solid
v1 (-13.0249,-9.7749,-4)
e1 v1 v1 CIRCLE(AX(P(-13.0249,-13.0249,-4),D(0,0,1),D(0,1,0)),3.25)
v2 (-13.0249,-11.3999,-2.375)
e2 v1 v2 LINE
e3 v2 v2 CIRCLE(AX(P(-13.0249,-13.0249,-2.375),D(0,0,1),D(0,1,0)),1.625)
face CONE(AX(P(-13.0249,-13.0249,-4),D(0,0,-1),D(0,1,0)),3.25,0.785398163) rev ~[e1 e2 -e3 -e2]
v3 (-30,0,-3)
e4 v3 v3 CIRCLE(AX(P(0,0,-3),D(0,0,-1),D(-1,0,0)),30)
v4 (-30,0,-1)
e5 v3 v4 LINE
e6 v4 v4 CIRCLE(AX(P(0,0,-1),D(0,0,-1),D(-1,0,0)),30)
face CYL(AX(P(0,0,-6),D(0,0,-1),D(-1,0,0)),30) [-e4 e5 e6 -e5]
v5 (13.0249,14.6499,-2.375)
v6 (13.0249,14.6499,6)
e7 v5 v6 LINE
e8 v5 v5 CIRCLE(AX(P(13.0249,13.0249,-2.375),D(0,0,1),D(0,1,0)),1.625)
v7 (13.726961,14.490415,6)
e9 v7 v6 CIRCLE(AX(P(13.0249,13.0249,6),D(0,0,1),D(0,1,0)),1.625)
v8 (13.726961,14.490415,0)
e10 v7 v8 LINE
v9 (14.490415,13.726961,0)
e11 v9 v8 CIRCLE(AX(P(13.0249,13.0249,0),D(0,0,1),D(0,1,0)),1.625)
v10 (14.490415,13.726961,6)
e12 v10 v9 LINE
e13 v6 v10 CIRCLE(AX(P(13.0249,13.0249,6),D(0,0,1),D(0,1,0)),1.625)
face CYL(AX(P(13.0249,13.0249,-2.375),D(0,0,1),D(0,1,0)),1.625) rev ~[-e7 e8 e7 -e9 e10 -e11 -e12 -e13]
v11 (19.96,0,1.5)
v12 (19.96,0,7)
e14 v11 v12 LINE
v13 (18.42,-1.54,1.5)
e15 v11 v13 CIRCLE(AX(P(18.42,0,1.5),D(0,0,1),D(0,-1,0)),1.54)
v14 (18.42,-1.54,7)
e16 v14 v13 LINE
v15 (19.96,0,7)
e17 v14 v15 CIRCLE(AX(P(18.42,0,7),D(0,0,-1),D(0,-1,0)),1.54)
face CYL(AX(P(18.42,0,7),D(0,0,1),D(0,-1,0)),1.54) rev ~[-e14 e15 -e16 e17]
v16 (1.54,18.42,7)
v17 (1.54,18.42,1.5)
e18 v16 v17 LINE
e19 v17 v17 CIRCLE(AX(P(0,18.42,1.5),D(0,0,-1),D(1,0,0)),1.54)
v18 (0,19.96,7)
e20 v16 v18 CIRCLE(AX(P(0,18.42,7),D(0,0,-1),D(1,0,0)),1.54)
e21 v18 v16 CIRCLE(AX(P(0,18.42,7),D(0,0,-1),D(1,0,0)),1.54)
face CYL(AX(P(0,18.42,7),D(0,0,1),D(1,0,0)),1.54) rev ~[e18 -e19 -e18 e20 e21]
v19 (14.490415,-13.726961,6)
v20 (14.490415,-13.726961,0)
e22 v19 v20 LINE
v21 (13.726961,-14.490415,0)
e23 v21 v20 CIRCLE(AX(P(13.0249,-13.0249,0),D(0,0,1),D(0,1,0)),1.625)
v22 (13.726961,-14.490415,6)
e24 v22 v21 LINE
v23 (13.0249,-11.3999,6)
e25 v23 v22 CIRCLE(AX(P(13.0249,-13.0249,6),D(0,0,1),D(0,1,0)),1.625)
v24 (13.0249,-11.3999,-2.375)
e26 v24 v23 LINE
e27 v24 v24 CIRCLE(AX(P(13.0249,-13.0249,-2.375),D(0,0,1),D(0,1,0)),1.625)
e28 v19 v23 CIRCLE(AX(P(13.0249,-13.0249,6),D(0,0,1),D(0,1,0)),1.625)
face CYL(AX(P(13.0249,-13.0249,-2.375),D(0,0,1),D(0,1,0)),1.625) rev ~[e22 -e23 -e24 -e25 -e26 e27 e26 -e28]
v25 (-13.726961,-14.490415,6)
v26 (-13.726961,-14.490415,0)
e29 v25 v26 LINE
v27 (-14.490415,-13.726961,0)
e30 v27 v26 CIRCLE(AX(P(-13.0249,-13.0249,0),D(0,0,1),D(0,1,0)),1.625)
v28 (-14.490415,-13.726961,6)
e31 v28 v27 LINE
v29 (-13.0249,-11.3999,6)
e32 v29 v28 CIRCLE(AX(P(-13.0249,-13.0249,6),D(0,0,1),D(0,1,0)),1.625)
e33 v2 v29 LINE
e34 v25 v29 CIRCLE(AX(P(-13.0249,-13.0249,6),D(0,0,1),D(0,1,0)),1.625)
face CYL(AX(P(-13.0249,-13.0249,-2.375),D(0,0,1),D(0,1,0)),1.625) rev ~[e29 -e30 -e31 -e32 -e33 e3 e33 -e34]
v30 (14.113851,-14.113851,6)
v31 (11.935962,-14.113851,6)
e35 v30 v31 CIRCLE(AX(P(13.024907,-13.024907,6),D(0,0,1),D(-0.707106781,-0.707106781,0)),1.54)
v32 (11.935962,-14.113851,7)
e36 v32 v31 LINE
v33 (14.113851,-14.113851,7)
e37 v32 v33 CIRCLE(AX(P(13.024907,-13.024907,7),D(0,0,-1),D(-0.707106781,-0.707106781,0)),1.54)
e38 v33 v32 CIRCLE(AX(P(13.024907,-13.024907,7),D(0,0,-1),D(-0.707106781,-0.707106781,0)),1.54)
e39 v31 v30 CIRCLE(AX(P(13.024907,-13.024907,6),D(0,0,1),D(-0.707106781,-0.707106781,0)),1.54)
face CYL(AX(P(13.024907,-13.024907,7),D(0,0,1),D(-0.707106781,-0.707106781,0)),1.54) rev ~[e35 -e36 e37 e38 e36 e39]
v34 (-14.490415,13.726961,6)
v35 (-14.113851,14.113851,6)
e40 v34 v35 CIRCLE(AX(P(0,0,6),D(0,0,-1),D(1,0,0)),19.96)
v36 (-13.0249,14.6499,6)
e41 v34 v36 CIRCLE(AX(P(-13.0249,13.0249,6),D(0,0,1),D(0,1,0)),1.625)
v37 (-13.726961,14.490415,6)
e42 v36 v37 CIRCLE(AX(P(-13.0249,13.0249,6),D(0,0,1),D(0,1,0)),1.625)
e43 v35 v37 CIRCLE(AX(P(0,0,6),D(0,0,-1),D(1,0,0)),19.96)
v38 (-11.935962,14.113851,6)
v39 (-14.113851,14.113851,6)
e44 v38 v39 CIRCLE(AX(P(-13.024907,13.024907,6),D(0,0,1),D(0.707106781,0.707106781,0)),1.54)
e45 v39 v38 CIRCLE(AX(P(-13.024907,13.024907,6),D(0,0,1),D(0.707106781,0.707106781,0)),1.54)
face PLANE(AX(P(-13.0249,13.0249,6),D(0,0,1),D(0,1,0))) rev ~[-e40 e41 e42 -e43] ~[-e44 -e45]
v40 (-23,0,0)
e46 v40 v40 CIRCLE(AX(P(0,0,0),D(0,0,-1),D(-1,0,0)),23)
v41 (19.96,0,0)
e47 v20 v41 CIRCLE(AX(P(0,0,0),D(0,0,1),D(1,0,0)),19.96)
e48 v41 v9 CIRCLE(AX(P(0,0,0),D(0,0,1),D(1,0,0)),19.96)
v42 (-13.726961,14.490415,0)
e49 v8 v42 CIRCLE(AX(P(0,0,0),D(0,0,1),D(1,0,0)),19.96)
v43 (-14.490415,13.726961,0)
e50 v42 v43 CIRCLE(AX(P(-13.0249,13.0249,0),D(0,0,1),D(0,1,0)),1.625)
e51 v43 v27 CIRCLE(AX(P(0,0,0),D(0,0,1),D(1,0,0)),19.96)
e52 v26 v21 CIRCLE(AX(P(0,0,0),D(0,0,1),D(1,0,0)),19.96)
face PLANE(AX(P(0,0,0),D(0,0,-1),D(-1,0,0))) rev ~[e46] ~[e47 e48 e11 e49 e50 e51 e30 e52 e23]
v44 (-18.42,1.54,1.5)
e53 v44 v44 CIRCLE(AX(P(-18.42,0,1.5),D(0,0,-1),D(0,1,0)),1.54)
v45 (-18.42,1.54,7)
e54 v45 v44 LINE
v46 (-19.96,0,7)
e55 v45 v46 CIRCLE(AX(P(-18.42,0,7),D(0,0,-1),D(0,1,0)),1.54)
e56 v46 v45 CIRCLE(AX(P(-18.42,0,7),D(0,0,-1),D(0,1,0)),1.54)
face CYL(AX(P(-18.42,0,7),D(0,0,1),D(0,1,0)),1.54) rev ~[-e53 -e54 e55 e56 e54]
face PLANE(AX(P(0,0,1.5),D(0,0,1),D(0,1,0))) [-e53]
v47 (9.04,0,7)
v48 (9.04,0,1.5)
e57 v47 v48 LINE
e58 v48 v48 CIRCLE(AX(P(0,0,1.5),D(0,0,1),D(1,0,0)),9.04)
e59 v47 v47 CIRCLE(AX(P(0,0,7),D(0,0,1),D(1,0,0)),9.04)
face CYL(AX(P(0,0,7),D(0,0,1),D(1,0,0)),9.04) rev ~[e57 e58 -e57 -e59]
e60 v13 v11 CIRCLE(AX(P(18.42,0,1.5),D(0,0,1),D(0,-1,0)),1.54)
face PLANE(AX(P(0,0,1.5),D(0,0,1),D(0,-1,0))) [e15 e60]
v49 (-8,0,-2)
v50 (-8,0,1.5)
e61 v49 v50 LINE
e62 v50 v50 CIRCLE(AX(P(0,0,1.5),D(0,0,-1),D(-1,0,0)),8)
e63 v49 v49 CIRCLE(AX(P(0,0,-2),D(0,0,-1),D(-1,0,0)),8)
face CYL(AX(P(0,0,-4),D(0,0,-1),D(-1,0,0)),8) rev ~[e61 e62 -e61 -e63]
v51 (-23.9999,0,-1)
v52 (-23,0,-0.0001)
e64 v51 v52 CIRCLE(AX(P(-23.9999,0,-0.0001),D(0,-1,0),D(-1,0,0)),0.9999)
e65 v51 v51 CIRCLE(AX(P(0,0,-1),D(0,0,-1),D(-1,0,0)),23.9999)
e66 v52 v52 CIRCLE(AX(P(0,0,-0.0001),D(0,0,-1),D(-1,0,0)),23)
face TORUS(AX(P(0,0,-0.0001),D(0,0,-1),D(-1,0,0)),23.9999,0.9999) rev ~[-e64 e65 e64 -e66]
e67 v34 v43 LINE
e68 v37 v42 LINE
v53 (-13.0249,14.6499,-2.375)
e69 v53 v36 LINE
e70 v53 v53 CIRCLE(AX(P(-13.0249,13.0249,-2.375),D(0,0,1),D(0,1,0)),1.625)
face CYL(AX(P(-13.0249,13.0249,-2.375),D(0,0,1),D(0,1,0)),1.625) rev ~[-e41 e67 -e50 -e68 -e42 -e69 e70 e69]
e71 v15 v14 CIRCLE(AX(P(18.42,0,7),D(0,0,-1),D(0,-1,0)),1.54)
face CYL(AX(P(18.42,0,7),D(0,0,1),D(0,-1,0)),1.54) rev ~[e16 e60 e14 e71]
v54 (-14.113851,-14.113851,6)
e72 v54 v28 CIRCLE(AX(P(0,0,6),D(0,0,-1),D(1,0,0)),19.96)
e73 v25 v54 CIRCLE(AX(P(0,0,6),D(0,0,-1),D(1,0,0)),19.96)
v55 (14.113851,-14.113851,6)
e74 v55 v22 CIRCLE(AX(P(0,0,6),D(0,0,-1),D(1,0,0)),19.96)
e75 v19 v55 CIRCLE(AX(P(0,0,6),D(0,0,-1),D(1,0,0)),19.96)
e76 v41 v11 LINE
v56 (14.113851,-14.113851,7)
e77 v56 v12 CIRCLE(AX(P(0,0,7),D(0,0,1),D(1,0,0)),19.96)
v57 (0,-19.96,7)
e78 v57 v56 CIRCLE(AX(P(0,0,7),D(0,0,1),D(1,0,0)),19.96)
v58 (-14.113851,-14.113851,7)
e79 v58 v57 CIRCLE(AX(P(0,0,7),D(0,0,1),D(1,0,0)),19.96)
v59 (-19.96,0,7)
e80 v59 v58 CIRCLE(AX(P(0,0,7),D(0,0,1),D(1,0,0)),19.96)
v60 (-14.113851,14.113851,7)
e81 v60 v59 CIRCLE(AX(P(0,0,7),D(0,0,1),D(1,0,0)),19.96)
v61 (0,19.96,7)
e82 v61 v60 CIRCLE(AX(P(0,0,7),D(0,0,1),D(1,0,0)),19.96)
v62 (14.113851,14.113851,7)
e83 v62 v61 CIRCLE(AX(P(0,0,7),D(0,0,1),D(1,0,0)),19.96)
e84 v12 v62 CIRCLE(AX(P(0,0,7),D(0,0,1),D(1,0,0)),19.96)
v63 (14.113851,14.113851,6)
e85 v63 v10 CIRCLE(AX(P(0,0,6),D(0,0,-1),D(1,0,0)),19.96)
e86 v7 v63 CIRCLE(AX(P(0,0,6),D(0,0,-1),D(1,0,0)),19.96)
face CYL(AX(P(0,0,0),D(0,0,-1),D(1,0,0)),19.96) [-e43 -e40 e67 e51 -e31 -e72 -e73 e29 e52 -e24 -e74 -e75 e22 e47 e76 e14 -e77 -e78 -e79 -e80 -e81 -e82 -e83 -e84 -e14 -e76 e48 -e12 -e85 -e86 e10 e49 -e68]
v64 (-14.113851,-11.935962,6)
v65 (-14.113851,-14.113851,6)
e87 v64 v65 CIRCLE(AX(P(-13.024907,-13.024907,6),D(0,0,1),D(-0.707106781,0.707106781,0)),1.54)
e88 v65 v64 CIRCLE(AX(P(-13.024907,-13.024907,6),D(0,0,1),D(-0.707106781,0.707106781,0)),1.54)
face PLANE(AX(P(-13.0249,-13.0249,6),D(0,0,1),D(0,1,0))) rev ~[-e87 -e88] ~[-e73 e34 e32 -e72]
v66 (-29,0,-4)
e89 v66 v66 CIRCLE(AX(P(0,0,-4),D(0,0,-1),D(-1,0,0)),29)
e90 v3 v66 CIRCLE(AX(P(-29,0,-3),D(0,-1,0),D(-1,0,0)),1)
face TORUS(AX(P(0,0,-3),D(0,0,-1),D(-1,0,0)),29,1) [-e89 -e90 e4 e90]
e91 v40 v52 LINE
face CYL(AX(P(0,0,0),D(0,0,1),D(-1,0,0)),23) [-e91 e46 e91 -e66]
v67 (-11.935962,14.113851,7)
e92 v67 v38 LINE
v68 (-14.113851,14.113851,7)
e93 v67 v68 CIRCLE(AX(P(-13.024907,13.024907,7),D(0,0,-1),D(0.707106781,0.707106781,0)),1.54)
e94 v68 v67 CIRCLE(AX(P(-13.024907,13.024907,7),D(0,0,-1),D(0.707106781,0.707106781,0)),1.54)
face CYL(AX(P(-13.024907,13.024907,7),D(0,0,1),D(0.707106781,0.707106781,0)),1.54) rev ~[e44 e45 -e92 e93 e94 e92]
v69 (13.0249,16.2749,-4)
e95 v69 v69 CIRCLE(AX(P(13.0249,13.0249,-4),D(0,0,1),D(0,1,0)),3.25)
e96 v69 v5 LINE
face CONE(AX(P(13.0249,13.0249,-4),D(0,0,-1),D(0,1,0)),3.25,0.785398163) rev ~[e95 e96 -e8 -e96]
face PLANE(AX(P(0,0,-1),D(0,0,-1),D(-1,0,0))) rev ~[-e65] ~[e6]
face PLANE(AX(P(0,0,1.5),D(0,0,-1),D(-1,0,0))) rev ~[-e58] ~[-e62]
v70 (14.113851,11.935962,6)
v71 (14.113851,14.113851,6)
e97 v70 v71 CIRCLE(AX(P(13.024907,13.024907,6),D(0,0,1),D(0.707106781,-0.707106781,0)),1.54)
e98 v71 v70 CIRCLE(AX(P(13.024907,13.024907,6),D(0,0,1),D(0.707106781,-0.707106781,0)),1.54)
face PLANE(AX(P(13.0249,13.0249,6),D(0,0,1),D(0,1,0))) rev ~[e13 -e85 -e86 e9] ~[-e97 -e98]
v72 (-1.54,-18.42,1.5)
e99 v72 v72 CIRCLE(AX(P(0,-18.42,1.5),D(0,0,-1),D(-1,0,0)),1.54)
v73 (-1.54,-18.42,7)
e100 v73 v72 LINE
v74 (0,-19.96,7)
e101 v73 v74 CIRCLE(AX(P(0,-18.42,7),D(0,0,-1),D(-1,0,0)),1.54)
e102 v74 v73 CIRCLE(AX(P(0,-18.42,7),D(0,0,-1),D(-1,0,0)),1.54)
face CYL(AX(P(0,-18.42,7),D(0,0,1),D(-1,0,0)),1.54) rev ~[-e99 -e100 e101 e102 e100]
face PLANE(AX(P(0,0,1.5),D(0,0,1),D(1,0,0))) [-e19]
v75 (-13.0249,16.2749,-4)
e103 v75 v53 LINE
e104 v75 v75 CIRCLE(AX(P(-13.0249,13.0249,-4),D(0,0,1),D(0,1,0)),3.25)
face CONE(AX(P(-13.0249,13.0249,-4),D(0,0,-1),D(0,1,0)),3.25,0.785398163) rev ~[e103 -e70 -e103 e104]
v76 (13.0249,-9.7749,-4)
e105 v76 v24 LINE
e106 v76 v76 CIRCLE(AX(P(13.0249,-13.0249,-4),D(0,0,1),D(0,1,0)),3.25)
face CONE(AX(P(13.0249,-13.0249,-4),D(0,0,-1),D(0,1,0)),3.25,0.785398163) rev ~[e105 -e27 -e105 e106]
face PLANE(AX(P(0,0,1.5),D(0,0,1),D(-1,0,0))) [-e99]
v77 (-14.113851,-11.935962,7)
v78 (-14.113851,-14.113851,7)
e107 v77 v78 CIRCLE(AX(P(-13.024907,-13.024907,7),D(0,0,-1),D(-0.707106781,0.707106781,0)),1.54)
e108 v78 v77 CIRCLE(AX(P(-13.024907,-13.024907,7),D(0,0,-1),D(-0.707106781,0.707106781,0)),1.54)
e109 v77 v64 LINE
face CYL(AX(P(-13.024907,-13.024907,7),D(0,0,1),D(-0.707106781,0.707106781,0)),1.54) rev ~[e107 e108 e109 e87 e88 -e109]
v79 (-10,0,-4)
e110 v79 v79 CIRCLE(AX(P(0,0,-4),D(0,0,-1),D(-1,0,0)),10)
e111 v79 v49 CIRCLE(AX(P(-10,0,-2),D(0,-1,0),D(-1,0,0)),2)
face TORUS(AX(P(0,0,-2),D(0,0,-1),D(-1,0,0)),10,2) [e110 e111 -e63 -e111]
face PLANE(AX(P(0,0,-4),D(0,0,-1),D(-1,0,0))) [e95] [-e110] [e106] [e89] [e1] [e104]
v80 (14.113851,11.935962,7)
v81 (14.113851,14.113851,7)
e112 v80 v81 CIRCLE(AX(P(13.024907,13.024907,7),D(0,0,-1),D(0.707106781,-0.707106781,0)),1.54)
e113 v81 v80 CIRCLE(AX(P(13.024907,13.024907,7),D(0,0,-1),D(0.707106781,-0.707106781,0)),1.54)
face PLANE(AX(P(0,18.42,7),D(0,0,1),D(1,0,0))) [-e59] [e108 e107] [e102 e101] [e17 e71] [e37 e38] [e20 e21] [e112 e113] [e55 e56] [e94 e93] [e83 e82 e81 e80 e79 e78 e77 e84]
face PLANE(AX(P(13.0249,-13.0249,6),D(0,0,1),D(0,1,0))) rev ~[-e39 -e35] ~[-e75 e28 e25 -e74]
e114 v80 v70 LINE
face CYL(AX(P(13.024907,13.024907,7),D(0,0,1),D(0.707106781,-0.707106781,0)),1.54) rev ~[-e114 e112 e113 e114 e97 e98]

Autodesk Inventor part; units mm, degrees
ref_plane "YZ Plane" through (0, 0, 0) normal (1, 0, 0) x (0, 1, 0)
ref_plane "XZ Plane" through (0, 0, 0) normal (0, 1, 0) x (-1, 0, 0)
ref_plane "XY Plane" through (0, 0, 0) normal (0, 0, 1) x (1, 0, 0)
sketch "Sketch1" plane through (0, 0, 0) normal (0, 0, 1) x (1, 0, 0)
  circle A0 centre (0, 0) radius 14
  circle A1 centre (0, 0) radius 19.96
  dimension "d0" = 28
  dimension "d1" = 39.92
extrude "Extrusion1" add sketch "Sketch1" along normal blind 7
sketch "Sketch2" plane through (0, 0, 0) normal (0, 0, -1) x (-1, 0, 0)
  circle A0 centre (0, 0) radius 23
  circle A1 centre (0, 0) radius 14 projected
  dimension "d4" = 46
extrude "Extrusion2" add sketch "Sketch2" along normal blind 6
sketch "Sketch3" plane through (0, 0, 7) normal (0, 0, 1) x (1, 0, 0)
  circle A0 centre (0, 18.42) radius 1.54
  line L0 (0, 0) -> (0, 23.5589)
  circle A1 centre (0, 0) radius 19.96 projected
  dimension "d7" = 3.08
extrude "Extrusion3" cut sketch "Sketch3" against normal blind 5.5 contours A0 L0 | L0 A0
pattern_circular "Circular Pattern1" count 8 over 360 about axis through (0, 0, 0) along (0, 0, 1) of "Extrusion3"
sketch "Sketch4" plane through (0, 18.42, 7) normal (0, 0, 1) x (1, 0, 0)
  circle A0 centre (0, -18.42) radius 14 projected
  circle A1 centre (0, -18.42) radius 9.04
  dimension "d14" = 18.08
extrude "Extrusion4" add sketch "Sketch4" against normal blind 11
sketch "Sketch5" plane through (0, 0, -4) normal (0, 0, -1) x (-1, 0, 0)
  circle A0 centre (0, 0) radius 9.04 projected
  circle A1 centre (0, 0) radius 8
  dimension "d17" = 16
extrude "Extrusion5" add sketch "Sketch5" against normal blind 5.5
sketch "Sketch7" plane through (0, 0, -6) normal (0, 0, -1) x (-1, 0, 0)
  circle A0 centre (0, 0) radius 23 projected
  circle A1 centre (0, 0) radius 30
  dimension "d27" = 60
extrude "Extrusion6" add sketch "Sketch7" against normal blind 5
fillet "Fillet1" radius 1 1 edges at (30, 0, -6)
sketch "Sketch8" plane through (0, 0, -6) normal (0, 0, -1) x (-1, 0, 0)
  circle A0 centre (0, 0) radius 22.5
  dimension "d31" = 45
extrude "Extrusion7" cut sketch "Sketch8" against normal blind 2
sketch "Sketch9" plane through (0, 0, -4) normal (0, 0, -1) x (-1, 0, 0)
  circle A0 centre (13.0249, 13.0249) radius 1.54 projected
  circle A1 centre (13.0249, -13.0249) radius 1.54 projected
  circle A2 centre (-13.0249, -13.0249) radius 1.54 projected
  circle A3 centre (-13.0249, 13.0249) radius 1.54 projected
  point P0 (0, 0)
  point P1 (14.1139, 14.1139)
  point P2 (14.1139, -14.1139)
  point P3 (-14.1139, -14.1139)
  point P4 (-14.1139, 14.1139)
hole "Hole2" at (13.0249, 13.0249, -4) at (-13.0249, 13.0249, -4) at (-13.0249, -13.0249, -4) at (13.0249, -13.0249, -4) direction (0, 0, 1) diameter 3.25 depth 10 countersink diameter 6.5 countersink angle 90
fillet "Fillet3" radius 1 1 edges at (23, 0, -1)
sketch "Sketch10" plane through (0, 0, -6) normal (0, 0, -1) x (-1, 0, 0)
  circle A0 centre (0, 0) radius 39.6905
extrude "Extrusion8" cut sketch "Sketch10" against normal up to surface (2 mm away)
fillet "Fillet4" radius 1 1 edges at (30, 0, -4)
fillet "Fillet5" radius 2 1 edges at (8, 0, -4)
properties part number "cycloid_outter_motor_side"
